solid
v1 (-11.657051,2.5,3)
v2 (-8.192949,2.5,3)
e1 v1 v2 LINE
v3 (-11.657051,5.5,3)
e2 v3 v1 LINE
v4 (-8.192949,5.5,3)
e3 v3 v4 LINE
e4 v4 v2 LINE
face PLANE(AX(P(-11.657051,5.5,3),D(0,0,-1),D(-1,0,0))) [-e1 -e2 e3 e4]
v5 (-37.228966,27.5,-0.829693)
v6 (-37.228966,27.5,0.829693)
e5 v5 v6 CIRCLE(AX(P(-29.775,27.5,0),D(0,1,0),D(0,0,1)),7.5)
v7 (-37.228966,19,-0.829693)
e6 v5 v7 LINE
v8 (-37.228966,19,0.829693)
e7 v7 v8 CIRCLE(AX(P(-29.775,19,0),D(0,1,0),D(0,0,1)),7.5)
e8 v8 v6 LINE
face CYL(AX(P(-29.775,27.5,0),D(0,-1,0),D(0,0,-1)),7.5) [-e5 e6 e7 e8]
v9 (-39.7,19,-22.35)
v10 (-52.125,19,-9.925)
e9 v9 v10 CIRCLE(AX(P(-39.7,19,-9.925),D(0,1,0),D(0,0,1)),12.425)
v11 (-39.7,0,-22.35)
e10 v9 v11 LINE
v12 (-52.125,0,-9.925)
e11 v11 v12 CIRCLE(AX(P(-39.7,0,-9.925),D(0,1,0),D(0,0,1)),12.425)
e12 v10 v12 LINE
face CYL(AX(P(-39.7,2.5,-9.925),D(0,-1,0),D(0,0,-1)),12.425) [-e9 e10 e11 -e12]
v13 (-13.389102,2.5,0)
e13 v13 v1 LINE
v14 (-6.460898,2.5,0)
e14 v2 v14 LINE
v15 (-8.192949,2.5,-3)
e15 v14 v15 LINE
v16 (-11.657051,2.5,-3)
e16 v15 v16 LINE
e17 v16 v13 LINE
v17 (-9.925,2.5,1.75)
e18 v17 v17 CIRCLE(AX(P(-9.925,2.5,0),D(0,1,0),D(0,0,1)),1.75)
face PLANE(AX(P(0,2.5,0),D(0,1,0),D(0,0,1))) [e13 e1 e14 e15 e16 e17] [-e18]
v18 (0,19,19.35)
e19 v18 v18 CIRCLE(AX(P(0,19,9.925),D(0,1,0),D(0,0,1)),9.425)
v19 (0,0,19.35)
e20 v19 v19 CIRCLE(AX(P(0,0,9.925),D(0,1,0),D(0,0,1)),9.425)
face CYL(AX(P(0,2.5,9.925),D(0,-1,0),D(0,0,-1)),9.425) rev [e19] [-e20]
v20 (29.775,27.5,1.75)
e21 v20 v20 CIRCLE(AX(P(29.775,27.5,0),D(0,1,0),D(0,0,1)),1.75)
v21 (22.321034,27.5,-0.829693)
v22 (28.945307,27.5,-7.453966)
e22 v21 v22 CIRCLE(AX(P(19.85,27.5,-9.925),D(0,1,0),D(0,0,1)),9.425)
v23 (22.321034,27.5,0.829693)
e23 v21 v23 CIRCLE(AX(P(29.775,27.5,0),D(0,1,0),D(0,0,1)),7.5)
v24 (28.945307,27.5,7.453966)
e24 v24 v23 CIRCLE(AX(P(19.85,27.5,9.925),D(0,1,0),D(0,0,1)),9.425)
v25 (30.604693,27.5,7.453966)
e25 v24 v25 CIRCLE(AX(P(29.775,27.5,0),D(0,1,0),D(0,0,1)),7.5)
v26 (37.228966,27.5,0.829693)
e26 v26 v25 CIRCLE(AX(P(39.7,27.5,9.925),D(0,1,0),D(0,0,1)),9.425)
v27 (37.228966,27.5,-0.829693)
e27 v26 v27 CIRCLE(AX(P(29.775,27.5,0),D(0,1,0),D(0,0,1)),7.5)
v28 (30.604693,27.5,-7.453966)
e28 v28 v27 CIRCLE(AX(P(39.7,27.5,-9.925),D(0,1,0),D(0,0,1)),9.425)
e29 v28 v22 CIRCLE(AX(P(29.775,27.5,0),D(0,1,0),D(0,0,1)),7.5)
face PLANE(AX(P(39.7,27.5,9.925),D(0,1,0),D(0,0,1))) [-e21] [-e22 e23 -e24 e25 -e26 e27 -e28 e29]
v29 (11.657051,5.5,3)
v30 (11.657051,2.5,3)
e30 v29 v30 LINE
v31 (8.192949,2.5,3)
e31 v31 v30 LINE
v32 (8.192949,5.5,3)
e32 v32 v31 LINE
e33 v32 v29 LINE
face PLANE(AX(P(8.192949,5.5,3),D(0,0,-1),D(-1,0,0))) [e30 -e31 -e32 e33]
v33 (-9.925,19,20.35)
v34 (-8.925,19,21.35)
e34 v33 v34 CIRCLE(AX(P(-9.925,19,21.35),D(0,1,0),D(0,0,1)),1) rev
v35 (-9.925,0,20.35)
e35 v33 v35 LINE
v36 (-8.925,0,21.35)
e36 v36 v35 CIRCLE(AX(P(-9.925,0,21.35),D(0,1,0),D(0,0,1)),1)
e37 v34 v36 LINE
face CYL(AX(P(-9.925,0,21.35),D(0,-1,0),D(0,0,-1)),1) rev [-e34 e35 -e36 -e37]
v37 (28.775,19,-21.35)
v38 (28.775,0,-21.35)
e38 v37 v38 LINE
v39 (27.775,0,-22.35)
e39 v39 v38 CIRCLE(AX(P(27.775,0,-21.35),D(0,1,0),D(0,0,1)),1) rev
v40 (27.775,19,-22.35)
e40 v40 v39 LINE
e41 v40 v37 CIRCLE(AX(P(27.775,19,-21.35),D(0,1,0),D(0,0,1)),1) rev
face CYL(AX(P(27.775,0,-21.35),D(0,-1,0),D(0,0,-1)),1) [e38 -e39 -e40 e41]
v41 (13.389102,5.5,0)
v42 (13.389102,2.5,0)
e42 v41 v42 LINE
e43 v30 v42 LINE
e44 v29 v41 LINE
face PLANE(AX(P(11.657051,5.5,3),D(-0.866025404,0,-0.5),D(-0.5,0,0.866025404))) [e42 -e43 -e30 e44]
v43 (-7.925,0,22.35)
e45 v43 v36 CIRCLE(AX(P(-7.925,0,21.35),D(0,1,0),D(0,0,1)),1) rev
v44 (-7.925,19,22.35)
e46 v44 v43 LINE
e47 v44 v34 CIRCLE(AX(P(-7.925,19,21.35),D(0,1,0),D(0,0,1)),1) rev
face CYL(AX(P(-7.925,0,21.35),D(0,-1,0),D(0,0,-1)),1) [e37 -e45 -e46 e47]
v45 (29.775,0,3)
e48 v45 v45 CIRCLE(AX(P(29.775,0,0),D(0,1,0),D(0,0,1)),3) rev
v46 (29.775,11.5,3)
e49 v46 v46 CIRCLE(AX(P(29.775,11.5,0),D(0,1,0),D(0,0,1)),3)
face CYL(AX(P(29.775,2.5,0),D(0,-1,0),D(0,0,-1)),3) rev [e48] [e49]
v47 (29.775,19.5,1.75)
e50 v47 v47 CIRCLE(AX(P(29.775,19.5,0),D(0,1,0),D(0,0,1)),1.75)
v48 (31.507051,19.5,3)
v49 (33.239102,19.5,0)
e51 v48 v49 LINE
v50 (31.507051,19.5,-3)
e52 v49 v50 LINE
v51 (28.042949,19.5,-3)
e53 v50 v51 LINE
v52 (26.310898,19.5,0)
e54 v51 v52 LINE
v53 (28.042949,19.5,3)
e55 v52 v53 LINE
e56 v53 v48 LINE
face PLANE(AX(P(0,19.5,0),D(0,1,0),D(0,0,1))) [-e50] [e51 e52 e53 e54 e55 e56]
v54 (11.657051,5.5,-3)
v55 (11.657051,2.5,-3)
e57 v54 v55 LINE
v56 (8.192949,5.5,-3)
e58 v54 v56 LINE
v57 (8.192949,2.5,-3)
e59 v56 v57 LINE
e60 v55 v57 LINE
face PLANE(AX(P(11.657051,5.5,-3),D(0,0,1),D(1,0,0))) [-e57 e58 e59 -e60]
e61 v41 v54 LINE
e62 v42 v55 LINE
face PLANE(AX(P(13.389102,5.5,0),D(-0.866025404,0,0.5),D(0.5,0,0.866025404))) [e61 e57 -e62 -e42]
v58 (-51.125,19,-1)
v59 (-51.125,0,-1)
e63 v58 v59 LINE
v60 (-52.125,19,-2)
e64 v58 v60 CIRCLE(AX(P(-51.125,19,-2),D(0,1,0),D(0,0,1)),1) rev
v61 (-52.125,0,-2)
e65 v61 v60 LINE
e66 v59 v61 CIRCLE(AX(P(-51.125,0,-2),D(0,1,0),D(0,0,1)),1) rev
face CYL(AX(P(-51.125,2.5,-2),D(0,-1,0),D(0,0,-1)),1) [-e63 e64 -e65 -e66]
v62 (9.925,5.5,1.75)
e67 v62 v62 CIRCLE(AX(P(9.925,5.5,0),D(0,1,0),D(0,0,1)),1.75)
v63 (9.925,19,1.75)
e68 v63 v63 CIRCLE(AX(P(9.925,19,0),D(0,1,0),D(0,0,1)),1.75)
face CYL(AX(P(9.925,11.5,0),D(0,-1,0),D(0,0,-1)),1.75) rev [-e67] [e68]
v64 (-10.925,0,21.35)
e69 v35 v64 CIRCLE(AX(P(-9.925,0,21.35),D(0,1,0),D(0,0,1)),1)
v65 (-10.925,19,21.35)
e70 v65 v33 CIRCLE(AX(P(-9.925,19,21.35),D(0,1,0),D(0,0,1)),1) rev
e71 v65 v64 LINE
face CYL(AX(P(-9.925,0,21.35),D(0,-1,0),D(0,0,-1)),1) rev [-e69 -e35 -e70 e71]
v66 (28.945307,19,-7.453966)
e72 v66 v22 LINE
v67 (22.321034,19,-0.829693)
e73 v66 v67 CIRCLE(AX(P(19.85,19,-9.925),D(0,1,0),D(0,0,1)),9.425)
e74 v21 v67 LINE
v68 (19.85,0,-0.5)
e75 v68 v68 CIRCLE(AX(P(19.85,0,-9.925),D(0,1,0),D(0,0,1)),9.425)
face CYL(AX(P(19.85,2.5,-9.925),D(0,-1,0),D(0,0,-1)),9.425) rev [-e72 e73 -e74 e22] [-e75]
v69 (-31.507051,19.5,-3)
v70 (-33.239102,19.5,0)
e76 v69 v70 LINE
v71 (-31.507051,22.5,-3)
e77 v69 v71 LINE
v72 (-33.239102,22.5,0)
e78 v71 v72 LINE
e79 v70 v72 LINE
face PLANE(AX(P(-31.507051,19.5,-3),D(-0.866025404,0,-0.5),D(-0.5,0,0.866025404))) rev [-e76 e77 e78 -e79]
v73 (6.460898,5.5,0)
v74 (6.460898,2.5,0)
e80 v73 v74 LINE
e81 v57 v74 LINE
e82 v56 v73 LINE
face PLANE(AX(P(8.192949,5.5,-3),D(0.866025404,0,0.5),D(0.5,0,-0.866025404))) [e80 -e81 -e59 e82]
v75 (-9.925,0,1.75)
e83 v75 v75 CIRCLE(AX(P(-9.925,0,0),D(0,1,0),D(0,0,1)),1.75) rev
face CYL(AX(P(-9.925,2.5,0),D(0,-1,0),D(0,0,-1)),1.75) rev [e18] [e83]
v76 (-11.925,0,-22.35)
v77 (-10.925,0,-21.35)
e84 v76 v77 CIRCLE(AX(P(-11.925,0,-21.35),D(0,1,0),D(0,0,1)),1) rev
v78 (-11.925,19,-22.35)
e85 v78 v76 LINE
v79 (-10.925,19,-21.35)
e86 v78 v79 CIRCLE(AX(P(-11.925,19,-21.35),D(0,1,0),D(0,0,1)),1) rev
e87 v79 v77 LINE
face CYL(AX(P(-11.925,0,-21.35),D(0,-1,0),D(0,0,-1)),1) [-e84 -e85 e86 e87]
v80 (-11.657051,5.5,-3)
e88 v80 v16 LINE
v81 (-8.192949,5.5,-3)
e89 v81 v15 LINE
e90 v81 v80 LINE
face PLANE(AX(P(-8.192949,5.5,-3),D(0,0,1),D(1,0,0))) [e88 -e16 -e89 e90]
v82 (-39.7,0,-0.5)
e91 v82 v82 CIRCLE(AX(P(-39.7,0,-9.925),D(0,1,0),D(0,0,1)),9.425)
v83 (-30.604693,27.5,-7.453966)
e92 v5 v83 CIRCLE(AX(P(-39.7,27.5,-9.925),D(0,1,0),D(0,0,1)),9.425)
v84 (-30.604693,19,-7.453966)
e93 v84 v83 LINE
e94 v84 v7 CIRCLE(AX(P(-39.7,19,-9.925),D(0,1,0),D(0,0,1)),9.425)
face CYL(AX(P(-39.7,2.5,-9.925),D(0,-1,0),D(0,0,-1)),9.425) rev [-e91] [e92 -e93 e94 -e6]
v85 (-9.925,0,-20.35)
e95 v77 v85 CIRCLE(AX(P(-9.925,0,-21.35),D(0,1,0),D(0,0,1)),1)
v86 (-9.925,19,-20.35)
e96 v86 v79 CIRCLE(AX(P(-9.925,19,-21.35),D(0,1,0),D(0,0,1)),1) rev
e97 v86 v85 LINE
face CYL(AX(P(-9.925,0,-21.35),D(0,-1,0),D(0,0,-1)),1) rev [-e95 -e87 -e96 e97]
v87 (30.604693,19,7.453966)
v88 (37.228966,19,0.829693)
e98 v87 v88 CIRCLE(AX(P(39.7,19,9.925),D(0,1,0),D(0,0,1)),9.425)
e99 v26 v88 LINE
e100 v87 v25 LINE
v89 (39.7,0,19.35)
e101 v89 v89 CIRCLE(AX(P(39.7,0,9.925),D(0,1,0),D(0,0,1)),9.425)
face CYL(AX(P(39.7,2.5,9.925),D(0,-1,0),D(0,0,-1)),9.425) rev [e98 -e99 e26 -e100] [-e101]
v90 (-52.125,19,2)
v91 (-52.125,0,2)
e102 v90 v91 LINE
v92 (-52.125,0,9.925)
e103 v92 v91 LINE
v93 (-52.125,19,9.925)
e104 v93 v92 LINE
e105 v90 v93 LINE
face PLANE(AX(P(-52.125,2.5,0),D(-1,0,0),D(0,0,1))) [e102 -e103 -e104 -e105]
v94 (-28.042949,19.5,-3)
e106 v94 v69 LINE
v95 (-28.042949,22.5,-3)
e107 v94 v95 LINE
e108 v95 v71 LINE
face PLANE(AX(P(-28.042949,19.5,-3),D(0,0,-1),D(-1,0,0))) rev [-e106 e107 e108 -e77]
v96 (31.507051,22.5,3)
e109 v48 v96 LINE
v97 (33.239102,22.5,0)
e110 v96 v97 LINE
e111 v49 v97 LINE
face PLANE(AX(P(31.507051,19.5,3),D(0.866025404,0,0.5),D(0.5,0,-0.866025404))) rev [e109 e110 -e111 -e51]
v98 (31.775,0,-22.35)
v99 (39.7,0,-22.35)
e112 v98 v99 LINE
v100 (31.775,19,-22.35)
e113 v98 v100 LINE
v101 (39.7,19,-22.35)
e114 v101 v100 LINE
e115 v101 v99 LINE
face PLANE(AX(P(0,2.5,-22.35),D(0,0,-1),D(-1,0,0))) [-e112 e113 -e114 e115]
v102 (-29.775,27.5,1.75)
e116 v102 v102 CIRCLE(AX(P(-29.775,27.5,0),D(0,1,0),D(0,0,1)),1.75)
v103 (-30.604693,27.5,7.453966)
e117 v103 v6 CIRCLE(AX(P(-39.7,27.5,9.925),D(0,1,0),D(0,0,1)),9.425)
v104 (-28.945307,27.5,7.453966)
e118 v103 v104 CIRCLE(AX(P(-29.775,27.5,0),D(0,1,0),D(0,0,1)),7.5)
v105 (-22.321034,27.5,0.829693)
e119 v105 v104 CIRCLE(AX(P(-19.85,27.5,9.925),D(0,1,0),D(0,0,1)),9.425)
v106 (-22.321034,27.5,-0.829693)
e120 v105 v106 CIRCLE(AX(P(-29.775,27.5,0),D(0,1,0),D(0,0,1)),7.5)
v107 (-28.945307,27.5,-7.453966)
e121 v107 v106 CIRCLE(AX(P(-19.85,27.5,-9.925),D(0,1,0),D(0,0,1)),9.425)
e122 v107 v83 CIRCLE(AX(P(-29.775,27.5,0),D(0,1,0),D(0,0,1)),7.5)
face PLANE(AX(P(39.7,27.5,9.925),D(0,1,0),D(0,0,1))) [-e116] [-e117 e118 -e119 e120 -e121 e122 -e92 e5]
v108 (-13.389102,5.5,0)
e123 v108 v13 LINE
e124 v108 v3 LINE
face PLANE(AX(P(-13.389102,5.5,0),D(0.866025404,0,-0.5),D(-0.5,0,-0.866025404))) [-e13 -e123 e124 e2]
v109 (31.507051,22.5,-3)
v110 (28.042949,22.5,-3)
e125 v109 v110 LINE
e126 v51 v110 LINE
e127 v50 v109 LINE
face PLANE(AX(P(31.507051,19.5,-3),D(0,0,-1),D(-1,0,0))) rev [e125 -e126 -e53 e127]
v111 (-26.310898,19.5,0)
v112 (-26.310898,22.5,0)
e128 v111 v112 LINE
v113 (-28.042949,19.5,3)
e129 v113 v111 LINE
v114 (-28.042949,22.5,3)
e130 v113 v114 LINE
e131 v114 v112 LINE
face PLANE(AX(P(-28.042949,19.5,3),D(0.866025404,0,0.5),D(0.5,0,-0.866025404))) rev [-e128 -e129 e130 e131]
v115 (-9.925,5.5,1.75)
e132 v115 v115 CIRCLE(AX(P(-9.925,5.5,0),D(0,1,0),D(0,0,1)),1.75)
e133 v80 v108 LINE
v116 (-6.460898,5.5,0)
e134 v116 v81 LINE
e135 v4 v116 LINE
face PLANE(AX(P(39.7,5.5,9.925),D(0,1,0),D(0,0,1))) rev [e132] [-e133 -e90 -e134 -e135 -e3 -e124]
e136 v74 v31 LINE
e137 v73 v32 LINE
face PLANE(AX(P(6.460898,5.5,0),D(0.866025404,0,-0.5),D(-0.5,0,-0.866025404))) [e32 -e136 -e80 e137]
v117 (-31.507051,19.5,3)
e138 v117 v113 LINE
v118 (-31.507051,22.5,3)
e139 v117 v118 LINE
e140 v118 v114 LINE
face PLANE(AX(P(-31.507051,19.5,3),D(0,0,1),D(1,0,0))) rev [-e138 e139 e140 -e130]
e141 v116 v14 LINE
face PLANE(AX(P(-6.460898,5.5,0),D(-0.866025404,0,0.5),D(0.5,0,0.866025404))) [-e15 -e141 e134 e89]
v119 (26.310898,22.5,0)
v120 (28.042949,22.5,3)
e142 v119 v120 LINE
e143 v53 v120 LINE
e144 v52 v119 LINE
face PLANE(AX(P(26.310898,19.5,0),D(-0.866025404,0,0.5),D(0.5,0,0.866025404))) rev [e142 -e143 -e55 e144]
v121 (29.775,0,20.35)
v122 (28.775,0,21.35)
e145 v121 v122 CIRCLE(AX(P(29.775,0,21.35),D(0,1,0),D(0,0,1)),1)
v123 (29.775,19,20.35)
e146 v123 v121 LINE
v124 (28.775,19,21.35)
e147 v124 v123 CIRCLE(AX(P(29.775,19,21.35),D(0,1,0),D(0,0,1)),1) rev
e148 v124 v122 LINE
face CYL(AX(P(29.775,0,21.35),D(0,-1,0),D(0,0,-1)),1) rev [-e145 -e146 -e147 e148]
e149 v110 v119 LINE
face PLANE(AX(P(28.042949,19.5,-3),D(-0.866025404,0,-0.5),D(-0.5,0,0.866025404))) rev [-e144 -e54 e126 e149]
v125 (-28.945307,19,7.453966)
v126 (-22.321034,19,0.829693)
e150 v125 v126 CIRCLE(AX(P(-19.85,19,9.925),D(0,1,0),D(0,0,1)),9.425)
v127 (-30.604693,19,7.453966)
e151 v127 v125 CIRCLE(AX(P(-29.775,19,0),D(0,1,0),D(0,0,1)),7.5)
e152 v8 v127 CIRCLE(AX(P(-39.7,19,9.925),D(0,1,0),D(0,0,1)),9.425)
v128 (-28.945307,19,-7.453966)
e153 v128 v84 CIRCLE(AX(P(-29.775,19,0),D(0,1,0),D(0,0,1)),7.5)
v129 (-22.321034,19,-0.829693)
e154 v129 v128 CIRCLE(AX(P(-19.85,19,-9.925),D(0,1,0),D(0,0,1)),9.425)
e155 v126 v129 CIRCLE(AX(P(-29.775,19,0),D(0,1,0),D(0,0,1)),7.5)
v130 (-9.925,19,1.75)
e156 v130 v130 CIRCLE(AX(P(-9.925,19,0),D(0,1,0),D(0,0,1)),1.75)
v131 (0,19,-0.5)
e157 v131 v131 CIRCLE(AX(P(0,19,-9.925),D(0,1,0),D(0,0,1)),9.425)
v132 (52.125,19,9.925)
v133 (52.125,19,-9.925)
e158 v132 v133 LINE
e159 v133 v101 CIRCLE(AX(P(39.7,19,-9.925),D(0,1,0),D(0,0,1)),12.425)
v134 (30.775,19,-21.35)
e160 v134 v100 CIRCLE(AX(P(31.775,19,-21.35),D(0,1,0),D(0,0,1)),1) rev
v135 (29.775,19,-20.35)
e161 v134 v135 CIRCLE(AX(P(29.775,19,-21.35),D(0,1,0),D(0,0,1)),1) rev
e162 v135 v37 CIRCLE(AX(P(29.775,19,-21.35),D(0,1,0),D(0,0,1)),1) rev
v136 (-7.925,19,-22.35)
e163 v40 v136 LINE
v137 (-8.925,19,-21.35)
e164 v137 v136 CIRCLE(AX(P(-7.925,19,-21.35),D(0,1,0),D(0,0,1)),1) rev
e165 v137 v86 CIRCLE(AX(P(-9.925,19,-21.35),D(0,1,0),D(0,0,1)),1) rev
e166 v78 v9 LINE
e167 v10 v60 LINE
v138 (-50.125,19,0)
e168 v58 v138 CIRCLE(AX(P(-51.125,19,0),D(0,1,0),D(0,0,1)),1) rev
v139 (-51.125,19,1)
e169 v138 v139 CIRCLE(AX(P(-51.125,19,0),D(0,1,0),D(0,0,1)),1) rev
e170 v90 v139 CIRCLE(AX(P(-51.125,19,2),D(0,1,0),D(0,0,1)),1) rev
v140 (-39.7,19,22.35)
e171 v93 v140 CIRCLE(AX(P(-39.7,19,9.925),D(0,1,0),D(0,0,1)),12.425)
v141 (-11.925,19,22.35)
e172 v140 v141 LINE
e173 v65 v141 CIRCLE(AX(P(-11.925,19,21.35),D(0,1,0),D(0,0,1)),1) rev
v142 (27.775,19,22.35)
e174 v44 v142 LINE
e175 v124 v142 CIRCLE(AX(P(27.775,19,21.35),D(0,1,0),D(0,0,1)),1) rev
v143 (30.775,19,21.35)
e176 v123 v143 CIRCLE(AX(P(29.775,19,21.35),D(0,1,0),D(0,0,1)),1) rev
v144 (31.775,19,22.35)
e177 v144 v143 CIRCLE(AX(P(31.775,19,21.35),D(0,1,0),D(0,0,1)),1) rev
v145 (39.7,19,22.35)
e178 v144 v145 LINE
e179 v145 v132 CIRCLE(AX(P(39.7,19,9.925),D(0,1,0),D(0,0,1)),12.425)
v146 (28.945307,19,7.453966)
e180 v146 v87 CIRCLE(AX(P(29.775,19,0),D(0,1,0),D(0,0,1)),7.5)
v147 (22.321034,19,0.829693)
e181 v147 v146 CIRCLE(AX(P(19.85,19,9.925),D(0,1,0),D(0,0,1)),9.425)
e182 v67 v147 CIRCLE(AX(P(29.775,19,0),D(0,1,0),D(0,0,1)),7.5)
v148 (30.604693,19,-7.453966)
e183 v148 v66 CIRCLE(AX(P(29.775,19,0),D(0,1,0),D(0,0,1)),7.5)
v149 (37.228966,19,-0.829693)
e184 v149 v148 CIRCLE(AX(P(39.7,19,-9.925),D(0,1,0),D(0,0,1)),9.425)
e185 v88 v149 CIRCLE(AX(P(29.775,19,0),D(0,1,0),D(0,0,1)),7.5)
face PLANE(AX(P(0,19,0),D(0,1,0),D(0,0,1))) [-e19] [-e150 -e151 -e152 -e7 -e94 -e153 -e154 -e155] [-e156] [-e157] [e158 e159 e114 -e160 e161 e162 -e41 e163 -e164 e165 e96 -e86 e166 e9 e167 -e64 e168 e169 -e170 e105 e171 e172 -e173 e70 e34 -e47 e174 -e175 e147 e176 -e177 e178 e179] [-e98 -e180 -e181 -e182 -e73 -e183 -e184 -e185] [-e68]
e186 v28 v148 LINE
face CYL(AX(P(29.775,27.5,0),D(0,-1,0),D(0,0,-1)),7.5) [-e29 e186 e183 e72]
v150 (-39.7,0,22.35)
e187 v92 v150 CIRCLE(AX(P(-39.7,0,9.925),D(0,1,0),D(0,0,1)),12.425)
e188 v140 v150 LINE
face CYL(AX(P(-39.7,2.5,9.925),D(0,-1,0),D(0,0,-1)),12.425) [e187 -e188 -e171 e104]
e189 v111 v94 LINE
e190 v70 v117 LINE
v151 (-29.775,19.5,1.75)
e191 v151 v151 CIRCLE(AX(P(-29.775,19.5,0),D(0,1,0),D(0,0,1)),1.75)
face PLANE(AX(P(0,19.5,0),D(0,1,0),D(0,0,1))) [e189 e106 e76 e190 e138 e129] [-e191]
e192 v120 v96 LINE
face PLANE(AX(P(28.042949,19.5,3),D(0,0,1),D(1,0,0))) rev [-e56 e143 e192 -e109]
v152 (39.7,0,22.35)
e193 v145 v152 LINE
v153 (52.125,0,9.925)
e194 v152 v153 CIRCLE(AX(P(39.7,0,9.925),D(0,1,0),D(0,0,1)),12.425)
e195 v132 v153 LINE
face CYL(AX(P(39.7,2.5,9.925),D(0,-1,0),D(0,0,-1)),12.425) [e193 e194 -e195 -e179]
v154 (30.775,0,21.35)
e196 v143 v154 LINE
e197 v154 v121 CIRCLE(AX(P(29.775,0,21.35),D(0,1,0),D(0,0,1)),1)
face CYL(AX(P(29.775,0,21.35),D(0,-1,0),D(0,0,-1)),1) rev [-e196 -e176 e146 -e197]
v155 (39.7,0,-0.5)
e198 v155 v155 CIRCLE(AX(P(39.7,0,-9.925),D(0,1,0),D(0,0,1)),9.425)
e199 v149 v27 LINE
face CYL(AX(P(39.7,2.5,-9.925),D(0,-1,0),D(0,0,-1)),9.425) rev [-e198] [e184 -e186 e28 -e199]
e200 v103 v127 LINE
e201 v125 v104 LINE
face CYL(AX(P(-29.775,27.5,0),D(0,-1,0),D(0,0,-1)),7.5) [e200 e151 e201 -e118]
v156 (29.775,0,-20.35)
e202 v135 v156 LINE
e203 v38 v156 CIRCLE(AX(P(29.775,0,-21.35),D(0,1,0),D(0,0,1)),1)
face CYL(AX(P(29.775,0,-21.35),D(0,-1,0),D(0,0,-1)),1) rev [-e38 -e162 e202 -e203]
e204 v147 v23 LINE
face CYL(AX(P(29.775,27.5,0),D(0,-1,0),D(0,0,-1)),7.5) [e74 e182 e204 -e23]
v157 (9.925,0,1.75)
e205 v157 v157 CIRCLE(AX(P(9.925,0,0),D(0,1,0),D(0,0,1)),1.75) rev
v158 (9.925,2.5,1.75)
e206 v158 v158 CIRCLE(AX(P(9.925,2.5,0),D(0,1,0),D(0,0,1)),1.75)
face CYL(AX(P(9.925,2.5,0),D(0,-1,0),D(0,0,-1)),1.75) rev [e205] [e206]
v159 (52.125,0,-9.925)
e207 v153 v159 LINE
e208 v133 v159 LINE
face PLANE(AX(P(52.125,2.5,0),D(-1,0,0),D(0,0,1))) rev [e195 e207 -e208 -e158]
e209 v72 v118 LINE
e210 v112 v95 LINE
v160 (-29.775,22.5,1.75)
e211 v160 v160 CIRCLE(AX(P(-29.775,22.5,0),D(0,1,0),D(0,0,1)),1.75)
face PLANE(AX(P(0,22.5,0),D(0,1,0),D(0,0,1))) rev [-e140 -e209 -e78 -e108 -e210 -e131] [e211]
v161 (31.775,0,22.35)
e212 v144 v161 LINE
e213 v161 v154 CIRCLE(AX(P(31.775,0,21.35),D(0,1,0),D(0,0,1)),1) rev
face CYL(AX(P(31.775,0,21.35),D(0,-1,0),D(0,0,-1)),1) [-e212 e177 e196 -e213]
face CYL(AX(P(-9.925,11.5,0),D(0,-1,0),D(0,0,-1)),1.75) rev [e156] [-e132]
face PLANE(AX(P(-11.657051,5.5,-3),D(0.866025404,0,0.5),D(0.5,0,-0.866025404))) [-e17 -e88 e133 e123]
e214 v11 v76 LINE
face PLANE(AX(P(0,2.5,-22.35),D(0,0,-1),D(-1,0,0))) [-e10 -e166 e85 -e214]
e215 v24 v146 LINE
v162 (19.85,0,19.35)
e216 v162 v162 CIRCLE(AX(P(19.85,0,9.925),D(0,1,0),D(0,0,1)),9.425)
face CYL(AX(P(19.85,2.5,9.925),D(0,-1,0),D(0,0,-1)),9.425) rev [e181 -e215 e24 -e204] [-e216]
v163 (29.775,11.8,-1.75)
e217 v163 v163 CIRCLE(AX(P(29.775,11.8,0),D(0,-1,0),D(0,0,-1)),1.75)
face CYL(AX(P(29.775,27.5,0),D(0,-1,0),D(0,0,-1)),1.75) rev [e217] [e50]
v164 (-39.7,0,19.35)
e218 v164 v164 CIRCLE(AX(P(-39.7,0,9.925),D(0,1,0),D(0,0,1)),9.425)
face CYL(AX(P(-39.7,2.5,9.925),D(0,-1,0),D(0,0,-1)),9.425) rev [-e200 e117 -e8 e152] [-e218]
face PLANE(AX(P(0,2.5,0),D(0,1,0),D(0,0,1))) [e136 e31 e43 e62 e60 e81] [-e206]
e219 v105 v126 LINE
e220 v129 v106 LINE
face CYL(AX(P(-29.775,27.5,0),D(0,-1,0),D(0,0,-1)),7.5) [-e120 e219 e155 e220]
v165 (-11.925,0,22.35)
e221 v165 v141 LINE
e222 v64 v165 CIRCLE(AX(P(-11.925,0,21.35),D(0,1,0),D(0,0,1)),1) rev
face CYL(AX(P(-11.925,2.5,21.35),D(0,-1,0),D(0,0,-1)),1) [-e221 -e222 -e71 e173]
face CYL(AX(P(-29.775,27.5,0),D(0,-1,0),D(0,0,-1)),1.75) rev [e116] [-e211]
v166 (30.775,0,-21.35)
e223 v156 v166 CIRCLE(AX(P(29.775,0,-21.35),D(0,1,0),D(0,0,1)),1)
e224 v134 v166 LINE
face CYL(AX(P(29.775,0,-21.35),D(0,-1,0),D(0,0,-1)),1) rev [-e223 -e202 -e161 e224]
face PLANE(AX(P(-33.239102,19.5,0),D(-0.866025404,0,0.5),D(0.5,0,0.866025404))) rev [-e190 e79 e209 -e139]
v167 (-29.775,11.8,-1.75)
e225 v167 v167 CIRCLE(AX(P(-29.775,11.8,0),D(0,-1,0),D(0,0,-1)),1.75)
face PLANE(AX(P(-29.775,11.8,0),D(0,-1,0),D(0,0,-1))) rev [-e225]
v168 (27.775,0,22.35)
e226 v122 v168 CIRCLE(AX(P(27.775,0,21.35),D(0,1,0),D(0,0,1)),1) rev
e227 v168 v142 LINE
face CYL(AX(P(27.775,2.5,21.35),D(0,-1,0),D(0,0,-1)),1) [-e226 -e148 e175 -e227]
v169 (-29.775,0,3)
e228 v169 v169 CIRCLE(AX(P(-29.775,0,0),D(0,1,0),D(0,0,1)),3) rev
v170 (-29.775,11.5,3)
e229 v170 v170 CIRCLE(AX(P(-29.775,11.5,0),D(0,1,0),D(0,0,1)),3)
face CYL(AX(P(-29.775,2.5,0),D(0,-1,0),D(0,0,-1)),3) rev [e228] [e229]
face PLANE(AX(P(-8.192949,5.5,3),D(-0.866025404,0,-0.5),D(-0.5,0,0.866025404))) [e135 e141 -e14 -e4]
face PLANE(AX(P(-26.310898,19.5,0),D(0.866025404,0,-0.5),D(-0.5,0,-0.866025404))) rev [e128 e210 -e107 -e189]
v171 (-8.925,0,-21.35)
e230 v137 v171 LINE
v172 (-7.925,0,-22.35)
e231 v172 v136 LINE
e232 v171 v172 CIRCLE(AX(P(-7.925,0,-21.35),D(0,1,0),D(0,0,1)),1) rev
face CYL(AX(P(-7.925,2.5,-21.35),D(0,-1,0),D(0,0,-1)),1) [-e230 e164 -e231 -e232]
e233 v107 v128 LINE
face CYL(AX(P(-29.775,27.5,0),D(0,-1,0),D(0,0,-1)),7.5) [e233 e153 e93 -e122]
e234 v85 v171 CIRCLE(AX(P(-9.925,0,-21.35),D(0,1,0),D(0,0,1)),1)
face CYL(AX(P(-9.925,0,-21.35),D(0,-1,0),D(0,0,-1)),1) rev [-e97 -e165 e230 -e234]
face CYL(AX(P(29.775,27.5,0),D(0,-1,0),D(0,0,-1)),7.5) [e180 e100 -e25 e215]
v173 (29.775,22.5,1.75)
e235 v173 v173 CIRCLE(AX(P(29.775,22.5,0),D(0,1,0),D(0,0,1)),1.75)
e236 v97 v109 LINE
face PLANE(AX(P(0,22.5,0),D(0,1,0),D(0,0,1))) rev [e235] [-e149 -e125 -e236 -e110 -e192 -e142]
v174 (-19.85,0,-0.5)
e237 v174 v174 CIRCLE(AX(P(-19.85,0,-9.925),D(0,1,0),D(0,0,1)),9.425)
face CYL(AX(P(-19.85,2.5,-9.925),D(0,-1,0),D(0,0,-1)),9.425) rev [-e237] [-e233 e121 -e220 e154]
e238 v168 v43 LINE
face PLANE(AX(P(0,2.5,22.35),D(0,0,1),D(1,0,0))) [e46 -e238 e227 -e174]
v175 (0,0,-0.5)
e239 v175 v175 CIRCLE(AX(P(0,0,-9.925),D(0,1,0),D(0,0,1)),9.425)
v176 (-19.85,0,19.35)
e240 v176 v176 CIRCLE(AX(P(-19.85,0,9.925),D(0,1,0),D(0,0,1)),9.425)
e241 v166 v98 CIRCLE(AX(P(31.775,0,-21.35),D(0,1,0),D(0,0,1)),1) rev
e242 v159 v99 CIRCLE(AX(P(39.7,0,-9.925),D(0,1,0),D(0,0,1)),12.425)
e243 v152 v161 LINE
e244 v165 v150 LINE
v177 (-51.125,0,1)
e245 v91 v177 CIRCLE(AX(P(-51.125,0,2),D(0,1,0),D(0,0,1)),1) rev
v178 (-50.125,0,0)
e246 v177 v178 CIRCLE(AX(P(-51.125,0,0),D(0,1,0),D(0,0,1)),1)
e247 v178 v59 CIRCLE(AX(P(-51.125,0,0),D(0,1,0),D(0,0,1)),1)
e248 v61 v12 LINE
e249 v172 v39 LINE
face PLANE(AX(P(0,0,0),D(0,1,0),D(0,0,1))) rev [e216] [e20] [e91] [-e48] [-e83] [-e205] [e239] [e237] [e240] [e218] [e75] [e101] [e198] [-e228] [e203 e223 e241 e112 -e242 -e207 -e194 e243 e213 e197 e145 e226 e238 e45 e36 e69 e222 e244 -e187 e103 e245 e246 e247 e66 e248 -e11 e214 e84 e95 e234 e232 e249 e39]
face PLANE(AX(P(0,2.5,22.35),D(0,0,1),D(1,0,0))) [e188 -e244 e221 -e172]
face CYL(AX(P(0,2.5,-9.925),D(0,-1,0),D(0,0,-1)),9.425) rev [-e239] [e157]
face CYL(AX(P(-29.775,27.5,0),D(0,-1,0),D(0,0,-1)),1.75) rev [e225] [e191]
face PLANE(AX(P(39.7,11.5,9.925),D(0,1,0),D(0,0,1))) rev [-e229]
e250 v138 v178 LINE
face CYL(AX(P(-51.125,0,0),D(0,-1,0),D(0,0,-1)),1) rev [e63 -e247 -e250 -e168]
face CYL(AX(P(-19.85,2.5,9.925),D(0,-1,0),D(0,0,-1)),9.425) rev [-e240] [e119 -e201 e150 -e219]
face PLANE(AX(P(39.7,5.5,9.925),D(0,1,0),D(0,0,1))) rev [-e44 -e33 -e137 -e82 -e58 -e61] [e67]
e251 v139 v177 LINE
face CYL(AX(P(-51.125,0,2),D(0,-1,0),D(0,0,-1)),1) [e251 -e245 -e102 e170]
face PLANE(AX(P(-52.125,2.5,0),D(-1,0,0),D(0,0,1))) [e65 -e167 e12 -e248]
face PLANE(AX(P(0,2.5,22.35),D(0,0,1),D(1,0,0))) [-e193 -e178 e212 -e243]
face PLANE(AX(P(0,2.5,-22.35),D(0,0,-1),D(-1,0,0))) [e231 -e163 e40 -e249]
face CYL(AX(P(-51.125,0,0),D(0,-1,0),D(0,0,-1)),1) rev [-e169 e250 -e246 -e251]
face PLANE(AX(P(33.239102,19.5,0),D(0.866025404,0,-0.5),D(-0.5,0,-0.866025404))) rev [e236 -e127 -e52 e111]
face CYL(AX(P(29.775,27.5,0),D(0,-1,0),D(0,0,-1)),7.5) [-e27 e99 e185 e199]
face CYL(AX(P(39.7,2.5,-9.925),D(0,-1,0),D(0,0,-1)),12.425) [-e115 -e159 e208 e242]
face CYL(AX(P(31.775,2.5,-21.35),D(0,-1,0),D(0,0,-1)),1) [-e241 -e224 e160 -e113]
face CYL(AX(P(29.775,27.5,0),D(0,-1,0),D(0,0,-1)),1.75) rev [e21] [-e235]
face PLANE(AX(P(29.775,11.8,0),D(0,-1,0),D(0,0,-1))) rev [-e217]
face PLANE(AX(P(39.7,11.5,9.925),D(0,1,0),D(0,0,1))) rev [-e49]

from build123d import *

# Parameters (mm, degrees)
SKETCH2_R               = 9.425
BOSS_EXTRUDE1_DEPTH     = 2.5
CUT_EXTRUDE3_DEPTH      = 57.769605644
CUT_EXTRUDE3_DEPTH_BACK = 57.769605644
SKETCH7_R               = 3
SKETCH7_R_2             = 1.75
SKETCH9_R               = 9.425
SKETCH9_R_2             = 3
BOSS_EXTRUDE2_DEPTH     = 3
SKETCH11_R              = 9.425
SKETCH11_R_2            = 3
SKETCH11_R_3            = 1.75
BOSS_EXTRUDE3_DEPTH     = 6
SKETCH12_R              = 9.425
SKETCH12_R_2            = 1.75
BOSS_EXTRUDE4_DEPTH     = 16
CUT_EXTRUDE4_DEPTH      = 3
SKETCH14_W              = 2
SKETCH14_H              = 2
CUT_EXTRUDE5_DEPTH      = 64.030057314
FILLET1_R               = 1
SKETCH15_W              = 104.25
SKETCH15_H              = 44.7
SKETCH15_R              = 7.5
CUT_EXTRUDE6_DEPTH      = 60.812524817
SKETCH16_R              = 3
BOSS_EXTRUDE5_DEPTH     = 0.3


with BuildPart() as part:
    # Sketch2 → Boss-Extrude1 (new body)
    with BuildSketch(Plane(origin=(0, 0, 0), x_dir=(1, 0, 0), z_dir=(0, 1, 0))):
        with BuildLine():
            Line((-39.7, -22.35), (39.7, -22.35))
            ThreePointArc((39.7, -22.35), (48.485801756, -18.710801756), (52.125, -9.925))
            Line((52.125, -9.925), (52.125, 9.925))
            ThreePointArc((52.125, 9.925), (48.485801756, 18.710801756), (39.7, 22.35))
            Line((39.7, 22.35), (-39.7, 22.35))
            ThreePointArc((-39.7, 22.35), (-48.485801756, 18.710801756), (-52.125, 9.925))
            Line((-52.125, 9.925), (-52.125, -9.925))
            ThreePointArc((-52.125, -9.925), (-48.485801756, -18.710801756), (-39.7, -22.35))
        make_face()
        with Locations(Location((-19.85, 9.925, 0), (0, 0, 270))):
            Circle(SKETCH2_R, mode=Mode.SUBTRACT)
        with Locations(Location((-39.7, -9.925, 0), (0, 0, 270))):
            Circle(SKETCH2_R, mode=Mode.SUBTRACT)
        with Locations(Location((-39.7, 9.925, 0), (0, 0, 270))):
            Circle(SKETCH2_R, mode=Mode.SUBTRACT)
        with Locations(Location((-19.85, -9.925, 0), (0, 0, 270))):
            Circle(SKETCH2_R, mode=Mode.SUBTRACT)
        with Locations(Location((19.85, -9.925, 0), (0, 0, 270))):
            Circle(SKETCH2_R, mode=Mode.SUBTRACT)
        with Locations(Location((39.7, 9.925, 0), (0, 0, 270))):
            Circle(SKETCH2_R, mode=Mode.SUBTRACT)
        with Locations(Location((39.7, -9.925, 0), (0, 0, 270))):
            Circle(SKETCH2_R, mode=Mode.SUBTRACT)
        with Locations(Location((19.85, 9.925, 0), (0, 0, 270))):
            Circle(SKETCH2_R, mode=Mode.SUBTRACT)
        with Locations(Location((0, -9.925, 0), (0, 0, 270))):
            Circle(SKETCH2_R, mode=Mode.SUBTRACT)
        with Locations(Location((0, 9.925, 0), (0, 0, 270))):
            Circle(SKETCH2_R, mode=Mode.SUBTRACT)
    extrude(amount=BOSS_EXTRUDE1_DEPTH)

    # Sketch7 → Cut-Extrude3 (cut, two sides: drawn at the far end of the back side and taken through both)
    with BuildSketch(Plane(origin=(0, 0, 0), x_dir=(1, 0, 0), z_dir=(0, 1, 0)).offset(-CUT_EXTRUDE3_DEPTH_BACK)):
        with Locations(Location((-29.775, 0, 0), (0, 0, 270))):
            Circle(SKETCH7_R)
        with Locations(Location((-9.925, 0, 0), (0, 0, 270))):
            Circle(SKETCH7_R_2)
        with Locations(Location((9.925, 0, 0), (0, 0, 270))):
            Circle(SKETCH7_R_2)
        with Locations(Location((29.775, 0, 0), (0, 0, 270))):
            Circle(SKETCH7_R)
    extrude(amount=CUT_EXTRUDE3_DEPTH + CUT_EXTRUDE3_DEPTH_BACK, mode=Mode.SUBTRACT)

    # Sketch9 → Boss-Extrude2 (add)
    with BuildSketch(Plane(origin=(0, 2.5, 0), x_dir=(1, 0, 0), z_dir=(0, 1, 0))):
        with BuildLine():
            Line((39.7, -22.35), (-39.7, -22.35))
            ThreePointArc((-39.7, -22.35), (-48.485801756, -18.710801756), (-52.125, -9.925))
            Line((-52.125, -9.925), (-52.125, 9.925))
            ThreePointArc((-52.125, 9.925), (-48.485801756, 18.710801756), (-39.7, 22.35))
            Line((-39.7, 22.35), (39.7, 22.35))
            ThreePointArc((39.7, 22.35), (48.485801756, 18.710801756), (52.125, 9.925))
            Line((52.125, 9.925), (52.125, -9.925))
            ThreePointArc((52.125, -9.925), (48.485801756, -18.710801756), (39.7, -22.35))
        make_face()
        with Locations(Location((39.7, -9.925, 0), (0, 0, 270))):
            Circle(SKETCH9_R, mode=Mode.SUBTRACT)
        with Locations(Location((19.85, -9.925, 0), (0, 0, 270))):
            Circle(SKETCH9_R, mode=Mode.SUBTRACT)
        with Locations(Location((0, -9.925, 0), (0, 0, 270))):
            Circle(SKETCH9_R, mode=Mode.SUBTRACT)
        with Locations(Location((-19.85, -9.925, 0), (0, 0, 270))):
            Circle(SKETCH9_R, mode=Mode.SUBTRACT)
        with Locations(Location((-39.7, -9.925, 0), (0, 0, 270))):
            Circle(SKETCH9_R, mode=Mode.SUBTRACT)
        with Locations(Location((-39.7, 9.925, 0), (0, 0, 270))):
            Circle(SKETCH9_R, mode=Mode.SUBTRACT)
        with Locations(Location((-19.85, 9.925, 0), (0, 0, 270))):
            Circle(SKETCH9_R, mode=Mode.SUBTRACT)
        with Locations(Location((0, 9.925, 0), (0, 0, 270))):
            Circle(SKETCH9_R, mode=Mode.SUBTRACT)
        with Locations(Location((19.85, 9.925, 0), (0, 0, 270))):
            Circle(SKETCH9_R, mode=Mode.SUBTRACT)
        with Locations(Location((39.7, 9.925, 0), (0, 0, 270))):
            Circle(SKETCH9_R, mode=Mode.SUBTRACT)
        with Locations(Location((29.775, 0, 0), (0, 0, 270))):
            Circle(SKETCH9_R_2, mode=Mode.SUBTRACT)
        with Locations(Location((-29.775, 0, 0), (0, 0, 270))):
            Circle(SKETCH9_R_2, mode=Mode.SUBTRACT)
        Polygon((6.460898385, 0), (8.192949192, -3), (11.657050808, -3), (13.389101615, 0), (11.657050808, 3), (8.192949192, 3), align=None, mode=Mode.SUBTRACT)
        Polygon((-6.460898385, 0), (-8.192949192, 3), (-11.657050808, 3), (-13.389101615, 0), (-11.657050808, -3), (-8.192949192, -3), align=None, mode=Mode.SUBTRACT)
    extrude(amount=BOSS_EXTRUDE2_DEPTH)

    # Sketch11 → Boss-Extrude3 (add)
    with BuildSketch(Plane(origin=(0, 5.5, 0), x_dir=(1, 0, 0), z_dir=(0, 1, 0))):
        with BuildLine():
            Line((39.7, -22.35), (-39.7, -22.35))
            ThreePointArc((-39.7, -22.35), (-48.485801756, -18.710801756), (-52.125, -9.925))
            Line((-52.125, -9.925), (-52.125, 9.925))
            ThreePointArc((-52.125, 9.925), (-48.485801756, 18.710801756), (-39.7, 22.35))
            Line((-39.7, 22.35), (39.7, 22.35))
            ThreePointArc((39.7, 22.35), (48.485801756, 18.710801756), (52.125, 9.925))
            Line((52.125, 9.925), (52.125, -9.925))
            ThreePointArc((52.125, -9.925), (48.485801756, -18.710801756), (39.7, -22.35))
        make_face()
        with Locations(Location((39.7, -9.925, 0), (0, 0, 270))):
            Circle(SKETCH11_R, mode=Mode.SUBTRACT)
        with Locations(Location((19.85, -9.925, 0), (0, 0, 270))):
            Circle(SKETCH11_R, mode=Mode.SUBTRACT)
        with Locations(Location((0, -9.925, 0), (0, 0, 270))):
            Circle(SKETCH11_R, mode=Mode.SUBTRACT)
        with Locations(Location((-19.85, -9.925, 0), (0, 0, 270))):
            Circle(SKETCH11_R, mode=Mode.SUBTRACT)
        with Locations(Location((-39.7, -9.925, 0), (0, 0, 270))):
            Circle(SKETCH11_R, mode=Mode.SUBTRACT)
        with Locations(Location((-39.7, 9.925, 0), (0, 0, 270))):
            Circle(SKETCH11_R, mode=Mode.SUBTRACT)
        with Locations(Location((-19.85, 9.925, 0), (0, 0, 270))):
            Circle(SKETCH11_R, mode=Mode.SUBTRACT)
        with Locations(Location((0, 9.925, 0), (0, 0, 270))):
            Circle(SKETCH11_R, mode=Mode.SUBTRACT)
        with Locations(Location((19.85, 9.925, 0), (0, 0, 270))):
            Circle(SKETCH11_R, mode=Mode.SUBTRACT)
        with Locations(Location((39.7, 9.925, 0), (0, 0, 270))):
            Circle(SKETCH11_R, mode=Mode.SUBTRACT)
        with Locations(Location((29.775, 0, 0), (0, 0, 270))):
            Circle(SKETCH11_R_2, mode=Mode.SUBTRACT)
        with Locations(Location((-29.775, 0, 0), (0, 0, 270))):
            Circle(SKETCH11_R_2, mode=Mode.SUBTRACT)
        with Locations(Location((-9.925, 0, 0), (0, 0, 270))):
            Circle(SKETCH11_R_3, mode=Mode.SUBTRACT)
        with Locations(Location((9.925, 0, 0), (0, 0, 270))):
            Circle(SKETCH11_R_3, mode=Mode.SUBTRACT)
    extrude(amount=BOSS_EXTRUDE3_DEPTH)

    # Sketch12 → Boss-Extrude4 (add)
    with BuildSketch(Plane(origin=(0, 11.5, 0), x_dir=(1, 0, 0), z_dir=(0, 1, 0))):
        with BuildLine():
            Line((39.7, -22.35), (-39.7, -22.35))
            ThreePointArc((-39.7, -22.35), (-48.485801756, -18.710801756), (-52.125, -9.925))
            Line((-52.125, -9.925), (-52.125, 9.925))
            ThreePointArc((-52.125, 9.925), (-48.485801756, 18.710801756), (-39.7, 22.35))
            Line((-39.7, 22.35), (39.7, 22.35))
            ThreePointArc((39.7, 22.35), (48.485801756, 18.710801756), (52.125, 9.925))
            Line((52.125, 9.925), (52.125, -9.925))
            ThreePointArc((52.125, -9.925), (48.485801756, -18.710801756), (39.7, -22.35))
        make_face()
        with Locations(Location((39.7, -9.925, 0), (0, 0, 270))):
            Circle(SKETCH12_R, mode=Mode.SUBTRACT)
        with Locations(Location((19.85, -9.925, 0), (0, 0, 270))):
            Circle(SKETCH12_R, mode=Mode.SUBTRACT)
        with Locations(Location((0, -9.925, 0), (0, 0, 270))):
            Circle(SKETCH12_R, mode=Mode.SUBTRACT)
        with Locations(Location((-19.85, -9.925, 0), (0, 0, 270))):
            Circle(SKETCH12_R, mode=Mode.SUBTRACT)
        with Locations(Location((-39.7, -9.925, 0), (0, 0, 270))):
            Circle(SKETCH12_R, mode=Mode.SUBTRACT)
        with Locations(Location((-39.7, 9.925, 0), (0, 0, 270))):
            Circle(SKETCH12_R, mode=Mode.SUBTRACT)
        with Locations(Location((-19.85, 9.925, 0), (0, 0, 270))):
            Circle(SKETCH12_R, mode=Mode.SUBTRACT)
        with Locations(Location((0, 9.925, 0), (0, 0, 270))):
            Circle(SKETCH12_R, mode=Mode.SUBTRACT)
        with Locations(Location((19.85, 9.925, 0), (0, 0, 270))):
            Circle(SKETCH12_R, mode=Mode.SUBTRACT)
        with Locations(Location((39.7, 9.925, 0), (0, 0, 270))):
            Circle(SKETCH12_R, mode=Mode.SUBTRACT)
        with Locations(Location((29.775, 0, 0), (0, 0, 270))):
            Circle(SKETCH12_R_2, mode=Mode.SUBTRACT)
        with Locations(Location((9.925, 0, 0), (0, 0, 270))):
            Circle(SKETCH12_R_2, mode=Mode.SUBTRACT)
        with Locations(Location((-9.925, 0, 0), (0, 0, 270))):
            Circle(SKETCH12_R_2, mode=Mode.SUBTRACT)
        with Locations(Location((-29.775, 0, 0), (0, 0, 270))):
            Circle(SKETCH12_R_2, mode=Mode.SUBTRACT)
    extrude(amount=BOSS_EXTRUDE4_DEPTH)

    # Sketch13 → Cut-Extrude4 (cut)
    with BuildSketch(Plane(origin=(0, 22.5, 0), x_dir=(1, 0, 0), z_dir=(0, 1, 0))):
        Polygon((-28.042949192, -3), (-26.310898385, 0), (-28.042949192, 3), (-31.507050808, 3), (-33.239101615, 0), (-31.507050808, -3), align=None)
        Polygon((28.042949192, -3), (31.507050808, -3), (33.239101615, 0), (31.507050808, 3), (28.042949192, 3), (26.310898385, 0), align=None)
    extrude(amount=-CUT_EXTRUDE4_DEPTH, mode=Mode.SUBTRACT)

    # Sketch14 → Cut-Extrude5 (cut, through all)
    with BuildSketch(Plane(origin=(0, 27.5, 0), x_dir=(1, 0, 0), z_dir=(0, 1, 0))):
        with Locations((-51.125, 0)):
            Rectangle(SKETCH14_W, SKETCH14_H)
        with Locations((29.775, -21.35)):
            Rectangle(SKETCH14_W, SKETCH14_H)
        with Locations((-9.925, -21.35)):
            Rectangle(SKETCH14_W, SKETCH14_H)
        with Locations((-9.925, 21.35)):
            Rectangle(SKETCH14_W, SKETCH14_H)
        with Locations((29.775, 21.35)):
            Rectangle(SKETCH14_W, SKETCH14_H)
    extrude(amount=-CUT_EXTRUDE5_DEPTH, mode=Mode.SUBTRACT)

    # Fillet1
    fillet1_edges = [part.edges().sort_by_distance(p)[0] for p in [
        (28.775, 13.75, -20.35),
        (30.775, 13.75, -20.35),
        (-10.925, 13.75, -20.35),
        (-8.925, 13.75, -20.35),
        (-50.125, 13.75, 1),
        (-50.125, 13.75, -1),
        (30.775, 13.75, 20.35),
        (28.775, 13.75, 20.35),
        (-8.925, 13.75, 20.35),
        (-10.925, 13.75, 20.35),
    ]]
    fillet(fillet1_edges, radius=FILLET1_R - 0.0001)  # a hair under: the kernel refuses the full size
    fillet1_2_edges = [part.edges().sort_by_distance(p)[0] for p in [
        (28.775, 27.5, -21.84995),
        (30.775, 27.5, -21.84995),
        (-10.925, 27.5, -21.84995),
        (-8.925, 27.5, -21.84995),
        (-51.62495, 27.5, 1),
        (-51.62495, 27.5, -1),
        (30.775, 27.5, 21.84995),
        (28.775, 27.5, 21.84995),
        (-8.925, 27.5, 21.84995),
        (-10.925, 27.5, 21.84995),
        (30.775, 13.75, -22.35),
        (28.775, 13.75, -22.35),
        (-8.925, 13.75, -22.35),
        (-10.925, 13.75, -22.35),
        (-52.125, 13.75, 1),
        (-52.125, 13.75, -1),
        (30.775, 13.75, 22.35),
        (28.775, 13.75, 22.35),
        (-8.925, 13.75, 22.35),
        (-10.925, 13.75, 22.35),
        (-10.632136071, 27.5, 20.642863929),
        (-9.217863929, 27.5, 20.642863929),
        (29.067863929, 27.5, 20.642863929),
        (30.482136071, 27.5, 20.642863929),
        (-50.417863929, 27.5, -0.707136071),
        (-50.417863929, 27.5, 0.707136071),
        (-9.217863929, 27.5, -20.642863929),
        (-10.632136071, 27.5, -20.642863929),
        (30.482136071, 27.5, -20.642863929),
        (29.067863929, 27.5, -20.642863929),
    ]]
    fillet(fillet1_2_edges, radius=FILLET1_R - 0.0001)  # a hair under: the kernel refuses the full size

    # Sketch15 → Cut-Extrude6 (cut, through all)
    with BuildSketch(Plane(origin=(0, 19, 0), x_dir=(1, 0, 0), z_dir=(0, 1, 0))):
        Rectangle(SKETCH15_W, SKETCH15_H)
        with Locations((-29.775, 0)):
            Circle(SKETCH15_R, mode=Mode.SUBTRACT)
        with Locations((29.775, 0)):
            Circle(SKETCH15_R, mode=Mode.SUBTRACT)
    extrude(amount=CUT_EXTRUDE6_DEPTH, mode=Mode.SUBTRACT)

    # Sketch16 → Boss-Extrude5 (add)
    with BuildSketch(Plane.XZ.offset(-11.5)):
        with Locations(Location((-29.775, 0, 0), (0, 0, 90))):
            Circle(SKETCH16_R)
        with Locations(Location((29.775, 0, 0), (0, 0, 90))):
            Circle(SKETCH16_R)
    extrude(amount=-BOSS_EXTRUDE5_DEPTH)


solid = part.part
